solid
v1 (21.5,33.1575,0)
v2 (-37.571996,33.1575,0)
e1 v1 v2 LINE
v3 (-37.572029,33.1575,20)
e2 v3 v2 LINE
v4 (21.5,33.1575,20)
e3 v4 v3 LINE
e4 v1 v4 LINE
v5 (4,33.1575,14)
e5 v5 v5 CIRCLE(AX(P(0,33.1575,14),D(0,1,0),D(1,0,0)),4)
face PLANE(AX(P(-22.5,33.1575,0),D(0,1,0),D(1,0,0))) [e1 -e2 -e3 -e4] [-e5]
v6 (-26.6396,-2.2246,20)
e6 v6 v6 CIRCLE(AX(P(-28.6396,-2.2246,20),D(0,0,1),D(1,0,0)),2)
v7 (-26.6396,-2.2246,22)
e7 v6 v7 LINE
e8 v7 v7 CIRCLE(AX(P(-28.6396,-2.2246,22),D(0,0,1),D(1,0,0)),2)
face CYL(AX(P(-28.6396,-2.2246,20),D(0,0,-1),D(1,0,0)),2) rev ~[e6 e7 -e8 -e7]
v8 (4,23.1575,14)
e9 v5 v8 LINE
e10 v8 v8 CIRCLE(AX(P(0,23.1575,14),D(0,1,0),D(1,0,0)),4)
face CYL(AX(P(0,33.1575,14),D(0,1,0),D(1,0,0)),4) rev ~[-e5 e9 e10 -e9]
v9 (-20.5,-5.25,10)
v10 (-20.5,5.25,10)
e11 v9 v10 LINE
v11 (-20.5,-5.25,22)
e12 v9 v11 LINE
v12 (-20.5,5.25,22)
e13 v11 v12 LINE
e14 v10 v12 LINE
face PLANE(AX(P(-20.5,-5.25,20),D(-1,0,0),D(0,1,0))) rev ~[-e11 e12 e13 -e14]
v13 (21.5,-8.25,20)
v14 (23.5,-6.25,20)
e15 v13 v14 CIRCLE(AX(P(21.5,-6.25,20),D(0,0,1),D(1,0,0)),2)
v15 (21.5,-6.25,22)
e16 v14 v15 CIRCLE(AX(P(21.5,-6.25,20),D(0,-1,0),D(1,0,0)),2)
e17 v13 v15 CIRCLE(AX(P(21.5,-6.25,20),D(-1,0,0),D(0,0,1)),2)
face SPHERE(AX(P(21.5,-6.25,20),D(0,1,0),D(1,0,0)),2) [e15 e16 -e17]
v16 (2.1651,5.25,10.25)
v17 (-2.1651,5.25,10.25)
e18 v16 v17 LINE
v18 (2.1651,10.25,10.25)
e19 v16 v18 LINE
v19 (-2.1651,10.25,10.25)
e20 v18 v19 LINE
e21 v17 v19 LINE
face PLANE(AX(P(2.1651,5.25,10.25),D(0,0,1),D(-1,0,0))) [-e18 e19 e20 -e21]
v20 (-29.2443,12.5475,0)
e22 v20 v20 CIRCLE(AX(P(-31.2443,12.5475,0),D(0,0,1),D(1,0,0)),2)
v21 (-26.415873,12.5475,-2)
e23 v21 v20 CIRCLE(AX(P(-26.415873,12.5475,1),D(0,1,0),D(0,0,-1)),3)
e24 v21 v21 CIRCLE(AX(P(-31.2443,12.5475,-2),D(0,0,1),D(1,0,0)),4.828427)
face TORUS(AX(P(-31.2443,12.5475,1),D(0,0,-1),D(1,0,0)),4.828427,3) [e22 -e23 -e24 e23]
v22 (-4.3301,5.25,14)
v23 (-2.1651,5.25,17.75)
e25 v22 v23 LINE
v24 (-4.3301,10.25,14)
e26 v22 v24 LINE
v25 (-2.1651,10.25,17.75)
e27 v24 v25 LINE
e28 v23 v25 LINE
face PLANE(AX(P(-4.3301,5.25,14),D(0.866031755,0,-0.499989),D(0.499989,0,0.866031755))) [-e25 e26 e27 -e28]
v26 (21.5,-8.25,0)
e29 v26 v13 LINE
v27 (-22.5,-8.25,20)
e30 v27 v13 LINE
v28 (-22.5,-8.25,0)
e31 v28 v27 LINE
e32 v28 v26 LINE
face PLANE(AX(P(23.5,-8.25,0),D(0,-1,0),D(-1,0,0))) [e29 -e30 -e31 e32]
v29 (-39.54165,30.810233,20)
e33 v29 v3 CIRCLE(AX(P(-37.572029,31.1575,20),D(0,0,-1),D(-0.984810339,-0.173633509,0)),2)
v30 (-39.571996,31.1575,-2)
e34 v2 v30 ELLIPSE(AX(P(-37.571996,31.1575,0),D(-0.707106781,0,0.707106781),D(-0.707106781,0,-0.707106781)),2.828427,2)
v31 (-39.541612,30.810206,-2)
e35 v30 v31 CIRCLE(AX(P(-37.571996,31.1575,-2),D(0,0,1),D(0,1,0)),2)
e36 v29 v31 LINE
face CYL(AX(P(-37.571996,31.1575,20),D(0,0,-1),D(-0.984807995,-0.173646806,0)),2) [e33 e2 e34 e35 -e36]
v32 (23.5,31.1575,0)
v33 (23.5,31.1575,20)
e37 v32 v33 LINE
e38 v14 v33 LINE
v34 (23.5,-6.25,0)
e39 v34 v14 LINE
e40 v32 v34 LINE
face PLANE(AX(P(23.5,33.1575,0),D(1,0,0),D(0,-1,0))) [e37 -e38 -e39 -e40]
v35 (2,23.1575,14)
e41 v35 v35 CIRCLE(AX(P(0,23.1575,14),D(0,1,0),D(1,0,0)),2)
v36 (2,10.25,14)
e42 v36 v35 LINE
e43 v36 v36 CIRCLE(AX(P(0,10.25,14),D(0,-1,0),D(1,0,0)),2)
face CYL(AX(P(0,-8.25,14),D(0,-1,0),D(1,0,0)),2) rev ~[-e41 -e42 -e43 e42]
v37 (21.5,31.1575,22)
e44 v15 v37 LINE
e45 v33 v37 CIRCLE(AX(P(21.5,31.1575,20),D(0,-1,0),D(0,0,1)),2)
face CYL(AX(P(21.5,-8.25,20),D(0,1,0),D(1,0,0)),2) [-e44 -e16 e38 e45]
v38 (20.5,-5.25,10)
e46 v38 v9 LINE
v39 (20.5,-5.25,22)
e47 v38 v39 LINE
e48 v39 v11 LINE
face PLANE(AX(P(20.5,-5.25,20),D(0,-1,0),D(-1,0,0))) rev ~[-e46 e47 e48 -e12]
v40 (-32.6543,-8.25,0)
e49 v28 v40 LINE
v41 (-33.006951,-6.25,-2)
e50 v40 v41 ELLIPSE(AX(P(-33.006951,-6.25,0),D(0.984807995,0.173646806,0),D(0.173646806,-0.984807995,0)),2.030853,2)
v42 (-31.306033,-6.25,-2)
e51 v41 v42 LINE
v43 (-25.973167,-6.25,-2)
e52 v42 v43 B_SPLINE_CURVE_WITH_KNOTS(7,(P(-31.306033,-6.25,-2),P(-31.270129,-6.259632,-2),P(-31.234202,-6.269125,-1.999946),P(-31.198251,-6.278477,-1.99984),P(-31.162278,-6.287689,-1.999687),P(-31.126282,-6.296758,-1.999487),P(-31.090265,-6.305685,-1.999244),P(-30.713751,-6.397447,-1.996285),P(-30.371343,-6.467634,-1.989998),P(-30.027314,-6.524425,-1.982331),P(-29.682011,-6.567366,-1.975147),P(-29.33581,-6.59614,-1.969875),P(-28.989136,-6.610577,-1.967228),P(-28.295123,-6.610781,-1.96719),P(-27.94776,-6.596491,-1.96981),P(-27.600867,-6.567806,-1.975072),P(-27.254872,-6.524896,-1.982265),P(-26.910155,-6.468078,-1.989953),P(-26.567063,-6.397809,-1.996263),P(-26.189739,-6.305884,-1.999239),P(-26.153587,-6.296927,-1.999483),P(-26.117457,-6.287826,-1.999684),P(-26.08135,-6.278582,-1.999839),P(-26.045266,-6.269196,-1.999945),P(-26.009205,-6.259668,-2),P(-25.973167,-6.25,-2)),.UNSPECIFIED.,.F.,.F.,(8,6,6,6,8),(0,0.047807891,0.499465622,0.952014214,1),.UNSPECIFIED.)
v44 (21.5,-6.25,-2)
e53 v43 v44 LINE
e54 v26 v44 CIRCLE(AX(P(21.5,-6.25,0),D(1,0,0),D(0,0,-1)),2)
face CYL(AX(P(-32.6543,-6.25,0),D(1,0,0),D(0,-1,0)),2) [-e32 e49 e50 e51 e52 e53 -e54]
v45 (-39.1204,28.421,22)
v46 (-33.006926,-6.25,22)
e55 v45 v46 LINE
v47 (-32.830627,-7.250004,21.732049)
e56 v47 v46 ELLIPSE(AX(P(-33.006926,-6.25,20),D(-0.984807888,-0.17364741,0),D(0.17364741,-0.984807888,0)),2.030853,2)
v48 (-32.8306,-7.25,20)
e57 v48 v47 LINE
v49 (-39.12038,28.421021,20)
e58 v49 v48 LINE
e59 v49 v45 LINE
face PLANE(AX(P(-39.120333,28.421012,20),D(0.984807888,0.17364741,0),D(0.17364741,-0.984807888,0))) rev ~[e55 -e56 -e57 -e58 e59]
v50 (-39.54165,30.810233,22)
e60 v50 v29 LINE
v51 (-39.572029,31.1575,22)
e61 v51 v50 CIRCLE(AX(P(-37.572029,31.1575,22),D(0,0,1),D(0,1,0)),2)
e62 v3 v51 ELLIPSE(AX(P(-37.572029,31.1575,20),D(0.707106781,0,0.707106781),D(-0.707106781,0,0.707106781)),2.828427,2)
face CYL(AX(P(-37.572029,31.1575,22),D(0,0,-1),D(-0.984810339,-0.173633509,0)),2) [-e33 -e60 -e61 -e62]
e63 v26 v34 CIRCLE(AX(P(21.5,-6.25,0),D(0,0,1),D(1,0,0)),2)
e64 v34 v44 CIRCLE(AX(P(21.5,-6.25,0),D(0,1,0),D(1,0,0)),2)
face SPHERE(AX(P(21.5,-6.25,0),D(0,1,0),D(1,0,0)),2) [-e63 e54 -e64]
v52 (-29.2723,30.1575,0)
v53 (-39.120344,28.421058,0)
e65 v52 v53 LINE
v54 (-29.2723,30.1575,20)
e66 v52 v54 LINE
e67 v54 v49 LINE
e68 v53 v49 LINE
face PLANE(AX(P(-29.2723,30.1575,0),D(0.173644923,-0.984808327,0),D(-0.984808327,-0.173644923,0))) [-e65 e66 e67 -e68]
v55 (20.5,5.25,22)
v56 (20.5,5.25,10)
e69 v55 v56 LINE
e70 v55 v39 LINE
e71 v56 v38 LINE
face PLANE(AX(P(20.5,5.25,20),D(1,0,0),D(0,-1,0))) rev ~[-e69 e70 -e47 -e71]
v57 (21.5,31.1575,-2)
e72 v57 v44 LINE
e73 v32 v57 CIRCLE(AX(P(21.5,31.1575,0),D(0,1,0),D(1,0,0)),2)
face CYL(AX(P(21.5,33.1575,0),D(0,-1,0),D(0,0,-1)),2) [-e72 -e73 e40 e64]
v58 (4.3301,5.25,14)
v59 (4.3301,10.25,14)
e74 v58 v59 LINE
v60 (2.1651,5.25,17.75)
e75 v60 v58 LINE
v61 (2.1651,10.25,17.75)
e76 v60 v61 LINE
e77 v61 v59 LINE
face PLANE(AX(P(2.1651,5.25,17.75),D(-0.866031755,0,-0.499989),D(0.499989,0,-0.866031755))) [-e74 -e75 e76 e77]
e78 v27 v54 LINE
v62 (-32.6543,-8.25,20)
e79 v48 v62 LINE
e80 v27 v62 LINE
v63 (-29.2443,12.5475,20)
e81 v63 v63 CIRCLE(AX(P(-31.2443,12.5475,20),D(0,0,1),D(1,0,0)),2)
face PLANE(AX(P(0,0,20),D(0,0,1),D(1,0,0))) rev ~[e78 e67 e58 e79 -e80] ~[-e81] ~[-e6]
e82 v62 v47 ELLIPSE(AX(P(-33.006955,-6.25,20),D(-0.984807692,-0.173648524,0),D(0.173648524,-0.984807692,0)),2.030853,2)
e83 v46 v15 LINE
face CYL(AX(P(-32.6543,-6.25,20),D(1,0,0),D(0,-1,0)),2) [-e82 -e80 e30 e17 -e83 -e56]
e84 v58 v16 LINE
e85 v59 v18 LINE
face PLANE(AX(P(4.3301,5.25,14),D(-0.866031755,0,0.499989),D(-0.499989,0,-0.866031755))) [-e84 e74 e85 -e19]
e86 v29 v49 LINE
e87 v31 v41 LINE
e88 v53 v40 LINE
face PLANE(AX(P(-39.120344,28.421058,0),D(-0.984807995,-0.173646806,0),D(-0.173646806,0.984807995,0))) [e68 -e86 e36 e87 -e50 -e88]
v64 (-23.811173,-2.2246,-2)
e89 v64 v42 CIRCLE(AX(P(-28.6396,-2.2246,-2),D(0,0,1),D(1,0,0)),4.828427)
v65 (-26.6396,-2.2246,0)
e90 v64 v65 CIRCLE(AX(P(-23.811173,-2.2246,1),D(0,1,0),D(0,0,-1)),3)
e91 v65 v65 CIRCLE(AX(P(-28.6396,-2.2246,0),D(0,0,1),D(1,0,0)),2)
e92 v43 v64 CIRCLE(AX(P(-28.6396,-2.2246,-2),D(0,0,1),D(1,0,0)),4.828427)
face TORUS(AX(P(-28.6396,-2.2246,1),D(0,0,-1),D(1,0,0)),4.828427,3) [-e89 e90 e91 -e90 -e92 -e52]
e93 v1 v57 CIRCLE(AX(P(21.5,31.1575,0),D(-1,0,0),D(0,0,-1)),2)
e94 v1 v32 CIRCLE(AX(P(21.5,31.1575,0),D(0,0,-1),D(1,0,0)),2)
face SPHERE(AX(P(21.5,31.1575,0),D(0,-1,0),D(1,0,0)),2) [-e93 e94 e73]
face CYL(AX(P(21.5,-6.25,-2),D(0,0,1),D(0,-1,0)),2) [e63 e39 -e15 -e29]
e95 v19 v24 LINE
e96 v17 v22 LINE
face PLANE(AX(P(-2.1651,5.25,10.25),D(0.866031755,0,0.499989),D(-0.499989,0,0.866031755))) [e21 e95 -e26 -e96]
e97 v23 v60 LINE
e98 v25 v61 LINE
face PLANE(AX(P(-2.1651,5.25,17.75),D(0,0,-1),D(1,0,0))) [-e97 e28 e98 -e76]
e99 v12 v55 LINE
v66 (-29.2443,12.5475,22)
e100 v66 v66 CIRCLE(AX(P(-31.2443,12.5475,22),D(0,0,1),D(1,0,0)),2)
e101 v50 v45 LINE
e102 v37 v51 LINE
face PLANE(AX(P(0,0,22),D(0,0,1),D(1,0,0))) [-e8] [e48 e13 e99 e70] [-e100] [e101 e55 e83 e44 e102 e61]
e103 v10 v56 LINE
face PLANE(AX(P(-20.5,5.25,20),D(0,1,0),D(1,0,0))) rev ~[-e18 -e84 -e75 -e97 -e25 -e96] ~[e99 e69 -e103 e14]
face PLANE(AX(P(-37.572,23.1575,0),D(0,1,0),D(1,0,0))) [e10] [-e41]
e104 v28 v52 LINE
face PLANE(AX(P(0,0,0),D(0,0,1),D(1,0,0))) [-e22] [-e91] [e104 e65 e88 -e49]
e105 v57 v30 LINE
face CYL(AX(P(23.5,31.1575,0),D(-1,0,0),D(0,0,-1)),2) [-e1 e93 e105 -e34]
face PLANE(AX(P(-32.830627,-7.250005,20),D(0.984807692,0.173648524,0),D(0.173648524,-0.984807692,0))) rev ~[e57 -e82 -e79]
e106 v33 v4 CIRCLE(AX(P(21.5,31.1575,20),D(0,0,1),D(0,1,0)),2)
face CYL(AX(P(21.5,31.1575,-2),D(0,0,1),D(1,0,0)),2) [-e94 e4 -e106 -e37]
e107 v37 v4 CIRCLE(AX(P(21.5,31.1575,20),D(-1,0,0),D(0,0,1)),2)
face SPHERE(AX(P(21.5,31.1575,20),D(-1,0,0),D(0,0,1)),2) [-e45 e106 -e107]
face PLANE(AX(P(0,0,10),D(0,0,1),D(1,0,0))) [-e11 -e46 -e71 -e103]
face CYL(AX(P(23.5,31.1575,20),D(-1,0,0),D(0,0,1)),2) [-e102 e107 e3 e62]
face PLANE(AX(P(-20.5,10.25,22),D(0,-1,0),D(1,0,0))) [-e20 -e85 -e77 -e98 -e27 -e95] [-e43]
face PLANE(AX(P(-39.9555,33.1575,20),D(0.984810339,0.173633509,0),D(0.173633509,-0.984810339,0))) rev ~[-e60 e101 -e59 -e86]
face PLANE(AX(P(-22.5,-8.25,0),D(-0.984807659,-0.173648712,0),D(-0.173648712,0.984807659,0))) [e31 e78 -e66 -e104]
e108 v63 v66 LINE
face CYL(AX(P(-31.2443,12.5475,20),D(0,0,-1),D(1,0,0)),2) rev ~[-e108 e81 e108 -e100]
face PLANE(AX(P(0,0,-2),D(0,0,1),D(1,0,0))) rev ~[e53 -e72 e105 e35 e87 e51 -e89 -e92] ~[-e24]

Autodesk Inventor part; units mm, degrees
ref_plane "YZ Plane" through (0, 0, 0) normal (1, 0, 0) x (0, 1, 0)
ref_plane "XZ Plane" through (0, 0, 0) normal (0, 1, 0) x (-1, 0, 0)
ref_plane "XY Plane" through (0, 0, 0) normal (0, 0, 1) x (1, 0, 0)
sketch "Skizze1" plane through (0, 0, 0) normal (0, 0, 1) x (1, 0, 0)
  line L0 (20.5, -5.25) -> (-20.5, -5.25)
  line L1 (-20.5, -5.25) -> (-20.5, 5.25)
  line L2 (-20.5, 5.25) -> (20.5, 5.25)
  line L3 (20.5, 5.25) -> (20.5, -5.25)
  line L4 (20.5, -5.25) -> (-20.5, 5.25) construction
  line L5 (-20.5, -5.25) -> (20.5, 5.25) construction
  line L6 (-22.5, -8.25) -> (-39.9555, -8.25)
  line L7 (-39.9555, -8.25) -> (-39.9555, 33.1575)
  line L8 (-39.9555, 33.1575) -> (-22.5, 33.1575)
  line L9 (-22.5, 33.1575) -> (-22.5, -8.25)
  line L10 (-22.5, 33.1575) -> (23.5, 33.1575)
  line L11 (23.5, 33.1575) -> (23.5, -8.25)
  line L12 (23.5, -8.25) -> (-22.5, -8.25)
  line L13 (-22.5, -8.25) -> (-22.5, 33.1575)
  line L14 (-22.5, -8.25) -> (-39.9555, -8.25)
  line L15 (-22.5, 30.1575) -> (-39.9555, 30.1575)
  line L16 (-22.5, -8.25) -> (-29.2723, 30.1575)
  line L17 (-32.6543, -8.25) -> (-39.9555, 33.1575)
  line L18 (-36.3049, 12.4538) -> (-25.8861, 10.9538) construction
  line L19 (-34.3494, 30.1575) -> (-27.5771, -8.25) construction
  circle A0 centre (-31.2443, 12.5475) radius 2
  circle A1 centre (-28.6396, -2.2246) radius 2
  line L20 (-29.2723, 30.1575) -> (-39.9555, 28.2738)
  line L21 (-22.5, -8.25) -> (-22.5, -8.25)
  point P0 (0, 0)
  point P1 (-32.6543, -8.25)
  point P2 (-39.4265, 30.1575)
  point P3 (-31.0955, 11.7038)
  point P4 (-39.1204, 28.421)
  point P5 (-32.334, -7.473)
  dimension "d0" = 10.5
  dimension "d1" = 41
  dimension "d2" = 3
  dimension "d3" = 3
  dimension "d4" = 3
  dimension "d6" = 10
  dimension "d7" = 10
  dimension "d16" = 4
  dimension "d18" = 15
  dimension "d21" = 39
  dimension "d23" = 17
  dimension "d24" = 7
  dimension "d29" = 2
extrude "Extrusion1" add sketch "Skizze1" along normal blind 20 contours L16 L15 L9 | L9 L10 L11 L12 | L15 L17 L8 L9 | L20 L17 L15
extrude "Extrusion2" add sketch "Skizze1" against normal blind 2 contours L0 L1 L2 L3 | L16 L15 L9 | L9 L10 L11 L12 | L6 L17 L20 L16 | L15 L17 L8 L9 | L20 L17 L15
sketch "Skizze2" plane through (0, 0, 20) normal (0, 0, 1) x (1, 0, 0)
  line L0 (-39.9555, 33.1575) -> (-39.1204, 28.421) projected
  line L1 (23.5, -8.25) -> (23.5, 33.1575) projected
  line L2 (23.5, 33.1575) -> (-39.9555, 33.1575) projected
  line L3 (20.5, -5.25) -> (-20.5, -5.25) projected
  line L4 (-20.5, -5.25) -> (-20.5, 5.25) projected
  line L5 (-20.5, 5.25) -> (20.5, 5.25) projected
  line L6 (20.5, 5.25) -> (20.5, -5.25) projected
  line L7 (-39.9555, 33.1575) -> (-32.8306, -7.25) projected
  line L8 (-39.9555, 33.1575) -> (-32.8306, -7.25)
  circle A0 centre (-28.6396, -2.2246) radius 2 projected
  circle A1 centre (-31.2443, 12.5475) radius 2 projected
  line L9 (-39.1204, 28.421) -> (-29.2723, 30.1575) projected
  line L10 (-29.2723, 30.1575) -> (-22.5, -8.25) projected
  line L11 (-22.5, -8.25) -> (23.5, -8.25) projected
  line L12 (-39.1204, 28.421) -> (-29.2723, 30.1575) projected
  line L13 (-39.1204, 28.421) -> (-32.6543, -8.25) projected
  line L14 (-32.6543, -8.25) -> (-22.5, -8.25) projected
  line L15 (-29.2723, 30.1575) -> (-22.5, -8.25) projected
  circle A2 centre (-28.6396, -2.2246) radius 2 projected
  circle A3 centre (-31.2443, 12.5475) radius 2 projected
  point P0 (0, 0)
  point P1 (-39.1307, 33.9543)
  point P2 (-39.1307, 33.9543)
  point P3 (-32.6543, -7.25)
  point P4 (-32.8306, -7.25)
extrude "Extrusion3" add sketch "Skizze2" along normal blind 2
fillet "Rundung1" radius 2 9 edges at (-8.2278, 33.1575, 22) (23.5, 12.4538, 22) (23.5, 12.4538, -2) (23.5, 33.1575, 10) (23.5, -8.25, 10) (-4.5771, -8.25, -2) (-8.2278, 33.1575, -2) (-4.5771, -8.25, 22) (-39.9555, 33.1575, 10)
sketch "Skizze3" plane through (-32.6543, -7.5, 20) normal (0, -1, 0) x (1, 0, 0)
  line L0 (53.1543, -20) -> (53.1543, 2) projected
  line L1 (53.1543, -9) -> (0, -9)
  line L2 (0, -20) -> (0, 0) projected
  line L3 (53.1543, 2) -> (12.1543, 2) projected
  line L4 (32.6543, -20) -> (32.6543, 2)
  circle A0 centre (32.6543, -9) radius 2
  dimension "d25" = 4
extrude "Extrusion4" [suppressed]
fillet "Rundung2" [suppressed]
sketch "Skizze5" plane through (-22.5, -8.25, 20) normal (0, -1, 0) x (1, 0, 0)
  line L0 (43, -20) -> (2, -20) projected
  line L1 (2, -20) -> (2, 2) projected
  line L2 (43, -20) -> (43, 2) projected
  line L3 (22.5, -14) -> (22.5, 2) construction
  line L4 (-17.072, 2) -> (44, 2) projected
  circle A0 centre (22.5, -6) radius 2
  line L5 (43, 2) -> (2, 2) projected
  line L6 (2, -6) -> (43, -6) construction
  dimension "d34" = 4
  dimension "d45" = 16
extrude "Extrusion6" cut sketch "Skizze5" against normal through all contours A0
fillet "Rundung3" [suppressed]
fillet "Rundung4" radius 3 2 edges at (-33.2443, 12.5475, -2) (-30.6396, -2.2246, -2)
extrude "Extrusion7" add sketch "Skizze5" against normal up to surface (3 mm away) contours A0
sketch "Skizze6" plane through (-37.572, 33.1575, 0) normal (0, 1, 0) x (1, 0, 0)
  circle A0 centre (37.572, -14) radius 2 projected
  circle A1 centre (37.572, -14) radius 2 projected
  circle A2 centre (37.572, -14) radius 4
  point P0 (37.572, 0)
  dimension "d40" = 8
extrude "Extrusion8" cut sketch "Skizze6" against normal blind 10
sketch "Skizze7" plane through (0, 0, 0) normal (0, 0, 1) x (1, 0, 0)
  line L0 (20.5, 5.25) -> (20.5, -5.25) projected
  line L1 (-20.5, 5.25) -> (20.5, 5.25) projected
  line L2 (-20.5, -5.25) -> (-20.5, 5.25) projected
  line L3 (20.5, -5.25) -> (-20.5, -5.25) projected
  point P0 (0, 0)
extrude "Extrusion9" add sketch "Skizze7" along normal blind 10
sketch "Skizze8" plane through (-20.5, 5.25, 22) normal (0, -1, 0) x (1, 0, 0)
  circle A0 centre (20.5, -8) radius 2 projected
  line L0 (24.8301, -8) -> (22.6651, -11.75)
  line L1 (22.6651, -11.75) -> (18.3349, -11.75)
  line L2 (18.3349, -11.75) -> (16.1699, -8)
  line L3 (16.1699, -8) -> (18.3349, -4.25)
  line L4 (18.3349, -4.25) -> (22.6651, -4.25)
  line L5 (22.6651, -4.25) -> (24.8301, -8)
  line L6 (0, -12) -> (41, -12) projected
  point P0 (20.5, -22)
  dimension "d46" = 7.5
extrude "Extrusion10" cut sketch "Skizze8" against normal blind 5
equation "\"d3\" = d2"
equation "\"d4\" = d2"
properties part number "_3D-Druck"
